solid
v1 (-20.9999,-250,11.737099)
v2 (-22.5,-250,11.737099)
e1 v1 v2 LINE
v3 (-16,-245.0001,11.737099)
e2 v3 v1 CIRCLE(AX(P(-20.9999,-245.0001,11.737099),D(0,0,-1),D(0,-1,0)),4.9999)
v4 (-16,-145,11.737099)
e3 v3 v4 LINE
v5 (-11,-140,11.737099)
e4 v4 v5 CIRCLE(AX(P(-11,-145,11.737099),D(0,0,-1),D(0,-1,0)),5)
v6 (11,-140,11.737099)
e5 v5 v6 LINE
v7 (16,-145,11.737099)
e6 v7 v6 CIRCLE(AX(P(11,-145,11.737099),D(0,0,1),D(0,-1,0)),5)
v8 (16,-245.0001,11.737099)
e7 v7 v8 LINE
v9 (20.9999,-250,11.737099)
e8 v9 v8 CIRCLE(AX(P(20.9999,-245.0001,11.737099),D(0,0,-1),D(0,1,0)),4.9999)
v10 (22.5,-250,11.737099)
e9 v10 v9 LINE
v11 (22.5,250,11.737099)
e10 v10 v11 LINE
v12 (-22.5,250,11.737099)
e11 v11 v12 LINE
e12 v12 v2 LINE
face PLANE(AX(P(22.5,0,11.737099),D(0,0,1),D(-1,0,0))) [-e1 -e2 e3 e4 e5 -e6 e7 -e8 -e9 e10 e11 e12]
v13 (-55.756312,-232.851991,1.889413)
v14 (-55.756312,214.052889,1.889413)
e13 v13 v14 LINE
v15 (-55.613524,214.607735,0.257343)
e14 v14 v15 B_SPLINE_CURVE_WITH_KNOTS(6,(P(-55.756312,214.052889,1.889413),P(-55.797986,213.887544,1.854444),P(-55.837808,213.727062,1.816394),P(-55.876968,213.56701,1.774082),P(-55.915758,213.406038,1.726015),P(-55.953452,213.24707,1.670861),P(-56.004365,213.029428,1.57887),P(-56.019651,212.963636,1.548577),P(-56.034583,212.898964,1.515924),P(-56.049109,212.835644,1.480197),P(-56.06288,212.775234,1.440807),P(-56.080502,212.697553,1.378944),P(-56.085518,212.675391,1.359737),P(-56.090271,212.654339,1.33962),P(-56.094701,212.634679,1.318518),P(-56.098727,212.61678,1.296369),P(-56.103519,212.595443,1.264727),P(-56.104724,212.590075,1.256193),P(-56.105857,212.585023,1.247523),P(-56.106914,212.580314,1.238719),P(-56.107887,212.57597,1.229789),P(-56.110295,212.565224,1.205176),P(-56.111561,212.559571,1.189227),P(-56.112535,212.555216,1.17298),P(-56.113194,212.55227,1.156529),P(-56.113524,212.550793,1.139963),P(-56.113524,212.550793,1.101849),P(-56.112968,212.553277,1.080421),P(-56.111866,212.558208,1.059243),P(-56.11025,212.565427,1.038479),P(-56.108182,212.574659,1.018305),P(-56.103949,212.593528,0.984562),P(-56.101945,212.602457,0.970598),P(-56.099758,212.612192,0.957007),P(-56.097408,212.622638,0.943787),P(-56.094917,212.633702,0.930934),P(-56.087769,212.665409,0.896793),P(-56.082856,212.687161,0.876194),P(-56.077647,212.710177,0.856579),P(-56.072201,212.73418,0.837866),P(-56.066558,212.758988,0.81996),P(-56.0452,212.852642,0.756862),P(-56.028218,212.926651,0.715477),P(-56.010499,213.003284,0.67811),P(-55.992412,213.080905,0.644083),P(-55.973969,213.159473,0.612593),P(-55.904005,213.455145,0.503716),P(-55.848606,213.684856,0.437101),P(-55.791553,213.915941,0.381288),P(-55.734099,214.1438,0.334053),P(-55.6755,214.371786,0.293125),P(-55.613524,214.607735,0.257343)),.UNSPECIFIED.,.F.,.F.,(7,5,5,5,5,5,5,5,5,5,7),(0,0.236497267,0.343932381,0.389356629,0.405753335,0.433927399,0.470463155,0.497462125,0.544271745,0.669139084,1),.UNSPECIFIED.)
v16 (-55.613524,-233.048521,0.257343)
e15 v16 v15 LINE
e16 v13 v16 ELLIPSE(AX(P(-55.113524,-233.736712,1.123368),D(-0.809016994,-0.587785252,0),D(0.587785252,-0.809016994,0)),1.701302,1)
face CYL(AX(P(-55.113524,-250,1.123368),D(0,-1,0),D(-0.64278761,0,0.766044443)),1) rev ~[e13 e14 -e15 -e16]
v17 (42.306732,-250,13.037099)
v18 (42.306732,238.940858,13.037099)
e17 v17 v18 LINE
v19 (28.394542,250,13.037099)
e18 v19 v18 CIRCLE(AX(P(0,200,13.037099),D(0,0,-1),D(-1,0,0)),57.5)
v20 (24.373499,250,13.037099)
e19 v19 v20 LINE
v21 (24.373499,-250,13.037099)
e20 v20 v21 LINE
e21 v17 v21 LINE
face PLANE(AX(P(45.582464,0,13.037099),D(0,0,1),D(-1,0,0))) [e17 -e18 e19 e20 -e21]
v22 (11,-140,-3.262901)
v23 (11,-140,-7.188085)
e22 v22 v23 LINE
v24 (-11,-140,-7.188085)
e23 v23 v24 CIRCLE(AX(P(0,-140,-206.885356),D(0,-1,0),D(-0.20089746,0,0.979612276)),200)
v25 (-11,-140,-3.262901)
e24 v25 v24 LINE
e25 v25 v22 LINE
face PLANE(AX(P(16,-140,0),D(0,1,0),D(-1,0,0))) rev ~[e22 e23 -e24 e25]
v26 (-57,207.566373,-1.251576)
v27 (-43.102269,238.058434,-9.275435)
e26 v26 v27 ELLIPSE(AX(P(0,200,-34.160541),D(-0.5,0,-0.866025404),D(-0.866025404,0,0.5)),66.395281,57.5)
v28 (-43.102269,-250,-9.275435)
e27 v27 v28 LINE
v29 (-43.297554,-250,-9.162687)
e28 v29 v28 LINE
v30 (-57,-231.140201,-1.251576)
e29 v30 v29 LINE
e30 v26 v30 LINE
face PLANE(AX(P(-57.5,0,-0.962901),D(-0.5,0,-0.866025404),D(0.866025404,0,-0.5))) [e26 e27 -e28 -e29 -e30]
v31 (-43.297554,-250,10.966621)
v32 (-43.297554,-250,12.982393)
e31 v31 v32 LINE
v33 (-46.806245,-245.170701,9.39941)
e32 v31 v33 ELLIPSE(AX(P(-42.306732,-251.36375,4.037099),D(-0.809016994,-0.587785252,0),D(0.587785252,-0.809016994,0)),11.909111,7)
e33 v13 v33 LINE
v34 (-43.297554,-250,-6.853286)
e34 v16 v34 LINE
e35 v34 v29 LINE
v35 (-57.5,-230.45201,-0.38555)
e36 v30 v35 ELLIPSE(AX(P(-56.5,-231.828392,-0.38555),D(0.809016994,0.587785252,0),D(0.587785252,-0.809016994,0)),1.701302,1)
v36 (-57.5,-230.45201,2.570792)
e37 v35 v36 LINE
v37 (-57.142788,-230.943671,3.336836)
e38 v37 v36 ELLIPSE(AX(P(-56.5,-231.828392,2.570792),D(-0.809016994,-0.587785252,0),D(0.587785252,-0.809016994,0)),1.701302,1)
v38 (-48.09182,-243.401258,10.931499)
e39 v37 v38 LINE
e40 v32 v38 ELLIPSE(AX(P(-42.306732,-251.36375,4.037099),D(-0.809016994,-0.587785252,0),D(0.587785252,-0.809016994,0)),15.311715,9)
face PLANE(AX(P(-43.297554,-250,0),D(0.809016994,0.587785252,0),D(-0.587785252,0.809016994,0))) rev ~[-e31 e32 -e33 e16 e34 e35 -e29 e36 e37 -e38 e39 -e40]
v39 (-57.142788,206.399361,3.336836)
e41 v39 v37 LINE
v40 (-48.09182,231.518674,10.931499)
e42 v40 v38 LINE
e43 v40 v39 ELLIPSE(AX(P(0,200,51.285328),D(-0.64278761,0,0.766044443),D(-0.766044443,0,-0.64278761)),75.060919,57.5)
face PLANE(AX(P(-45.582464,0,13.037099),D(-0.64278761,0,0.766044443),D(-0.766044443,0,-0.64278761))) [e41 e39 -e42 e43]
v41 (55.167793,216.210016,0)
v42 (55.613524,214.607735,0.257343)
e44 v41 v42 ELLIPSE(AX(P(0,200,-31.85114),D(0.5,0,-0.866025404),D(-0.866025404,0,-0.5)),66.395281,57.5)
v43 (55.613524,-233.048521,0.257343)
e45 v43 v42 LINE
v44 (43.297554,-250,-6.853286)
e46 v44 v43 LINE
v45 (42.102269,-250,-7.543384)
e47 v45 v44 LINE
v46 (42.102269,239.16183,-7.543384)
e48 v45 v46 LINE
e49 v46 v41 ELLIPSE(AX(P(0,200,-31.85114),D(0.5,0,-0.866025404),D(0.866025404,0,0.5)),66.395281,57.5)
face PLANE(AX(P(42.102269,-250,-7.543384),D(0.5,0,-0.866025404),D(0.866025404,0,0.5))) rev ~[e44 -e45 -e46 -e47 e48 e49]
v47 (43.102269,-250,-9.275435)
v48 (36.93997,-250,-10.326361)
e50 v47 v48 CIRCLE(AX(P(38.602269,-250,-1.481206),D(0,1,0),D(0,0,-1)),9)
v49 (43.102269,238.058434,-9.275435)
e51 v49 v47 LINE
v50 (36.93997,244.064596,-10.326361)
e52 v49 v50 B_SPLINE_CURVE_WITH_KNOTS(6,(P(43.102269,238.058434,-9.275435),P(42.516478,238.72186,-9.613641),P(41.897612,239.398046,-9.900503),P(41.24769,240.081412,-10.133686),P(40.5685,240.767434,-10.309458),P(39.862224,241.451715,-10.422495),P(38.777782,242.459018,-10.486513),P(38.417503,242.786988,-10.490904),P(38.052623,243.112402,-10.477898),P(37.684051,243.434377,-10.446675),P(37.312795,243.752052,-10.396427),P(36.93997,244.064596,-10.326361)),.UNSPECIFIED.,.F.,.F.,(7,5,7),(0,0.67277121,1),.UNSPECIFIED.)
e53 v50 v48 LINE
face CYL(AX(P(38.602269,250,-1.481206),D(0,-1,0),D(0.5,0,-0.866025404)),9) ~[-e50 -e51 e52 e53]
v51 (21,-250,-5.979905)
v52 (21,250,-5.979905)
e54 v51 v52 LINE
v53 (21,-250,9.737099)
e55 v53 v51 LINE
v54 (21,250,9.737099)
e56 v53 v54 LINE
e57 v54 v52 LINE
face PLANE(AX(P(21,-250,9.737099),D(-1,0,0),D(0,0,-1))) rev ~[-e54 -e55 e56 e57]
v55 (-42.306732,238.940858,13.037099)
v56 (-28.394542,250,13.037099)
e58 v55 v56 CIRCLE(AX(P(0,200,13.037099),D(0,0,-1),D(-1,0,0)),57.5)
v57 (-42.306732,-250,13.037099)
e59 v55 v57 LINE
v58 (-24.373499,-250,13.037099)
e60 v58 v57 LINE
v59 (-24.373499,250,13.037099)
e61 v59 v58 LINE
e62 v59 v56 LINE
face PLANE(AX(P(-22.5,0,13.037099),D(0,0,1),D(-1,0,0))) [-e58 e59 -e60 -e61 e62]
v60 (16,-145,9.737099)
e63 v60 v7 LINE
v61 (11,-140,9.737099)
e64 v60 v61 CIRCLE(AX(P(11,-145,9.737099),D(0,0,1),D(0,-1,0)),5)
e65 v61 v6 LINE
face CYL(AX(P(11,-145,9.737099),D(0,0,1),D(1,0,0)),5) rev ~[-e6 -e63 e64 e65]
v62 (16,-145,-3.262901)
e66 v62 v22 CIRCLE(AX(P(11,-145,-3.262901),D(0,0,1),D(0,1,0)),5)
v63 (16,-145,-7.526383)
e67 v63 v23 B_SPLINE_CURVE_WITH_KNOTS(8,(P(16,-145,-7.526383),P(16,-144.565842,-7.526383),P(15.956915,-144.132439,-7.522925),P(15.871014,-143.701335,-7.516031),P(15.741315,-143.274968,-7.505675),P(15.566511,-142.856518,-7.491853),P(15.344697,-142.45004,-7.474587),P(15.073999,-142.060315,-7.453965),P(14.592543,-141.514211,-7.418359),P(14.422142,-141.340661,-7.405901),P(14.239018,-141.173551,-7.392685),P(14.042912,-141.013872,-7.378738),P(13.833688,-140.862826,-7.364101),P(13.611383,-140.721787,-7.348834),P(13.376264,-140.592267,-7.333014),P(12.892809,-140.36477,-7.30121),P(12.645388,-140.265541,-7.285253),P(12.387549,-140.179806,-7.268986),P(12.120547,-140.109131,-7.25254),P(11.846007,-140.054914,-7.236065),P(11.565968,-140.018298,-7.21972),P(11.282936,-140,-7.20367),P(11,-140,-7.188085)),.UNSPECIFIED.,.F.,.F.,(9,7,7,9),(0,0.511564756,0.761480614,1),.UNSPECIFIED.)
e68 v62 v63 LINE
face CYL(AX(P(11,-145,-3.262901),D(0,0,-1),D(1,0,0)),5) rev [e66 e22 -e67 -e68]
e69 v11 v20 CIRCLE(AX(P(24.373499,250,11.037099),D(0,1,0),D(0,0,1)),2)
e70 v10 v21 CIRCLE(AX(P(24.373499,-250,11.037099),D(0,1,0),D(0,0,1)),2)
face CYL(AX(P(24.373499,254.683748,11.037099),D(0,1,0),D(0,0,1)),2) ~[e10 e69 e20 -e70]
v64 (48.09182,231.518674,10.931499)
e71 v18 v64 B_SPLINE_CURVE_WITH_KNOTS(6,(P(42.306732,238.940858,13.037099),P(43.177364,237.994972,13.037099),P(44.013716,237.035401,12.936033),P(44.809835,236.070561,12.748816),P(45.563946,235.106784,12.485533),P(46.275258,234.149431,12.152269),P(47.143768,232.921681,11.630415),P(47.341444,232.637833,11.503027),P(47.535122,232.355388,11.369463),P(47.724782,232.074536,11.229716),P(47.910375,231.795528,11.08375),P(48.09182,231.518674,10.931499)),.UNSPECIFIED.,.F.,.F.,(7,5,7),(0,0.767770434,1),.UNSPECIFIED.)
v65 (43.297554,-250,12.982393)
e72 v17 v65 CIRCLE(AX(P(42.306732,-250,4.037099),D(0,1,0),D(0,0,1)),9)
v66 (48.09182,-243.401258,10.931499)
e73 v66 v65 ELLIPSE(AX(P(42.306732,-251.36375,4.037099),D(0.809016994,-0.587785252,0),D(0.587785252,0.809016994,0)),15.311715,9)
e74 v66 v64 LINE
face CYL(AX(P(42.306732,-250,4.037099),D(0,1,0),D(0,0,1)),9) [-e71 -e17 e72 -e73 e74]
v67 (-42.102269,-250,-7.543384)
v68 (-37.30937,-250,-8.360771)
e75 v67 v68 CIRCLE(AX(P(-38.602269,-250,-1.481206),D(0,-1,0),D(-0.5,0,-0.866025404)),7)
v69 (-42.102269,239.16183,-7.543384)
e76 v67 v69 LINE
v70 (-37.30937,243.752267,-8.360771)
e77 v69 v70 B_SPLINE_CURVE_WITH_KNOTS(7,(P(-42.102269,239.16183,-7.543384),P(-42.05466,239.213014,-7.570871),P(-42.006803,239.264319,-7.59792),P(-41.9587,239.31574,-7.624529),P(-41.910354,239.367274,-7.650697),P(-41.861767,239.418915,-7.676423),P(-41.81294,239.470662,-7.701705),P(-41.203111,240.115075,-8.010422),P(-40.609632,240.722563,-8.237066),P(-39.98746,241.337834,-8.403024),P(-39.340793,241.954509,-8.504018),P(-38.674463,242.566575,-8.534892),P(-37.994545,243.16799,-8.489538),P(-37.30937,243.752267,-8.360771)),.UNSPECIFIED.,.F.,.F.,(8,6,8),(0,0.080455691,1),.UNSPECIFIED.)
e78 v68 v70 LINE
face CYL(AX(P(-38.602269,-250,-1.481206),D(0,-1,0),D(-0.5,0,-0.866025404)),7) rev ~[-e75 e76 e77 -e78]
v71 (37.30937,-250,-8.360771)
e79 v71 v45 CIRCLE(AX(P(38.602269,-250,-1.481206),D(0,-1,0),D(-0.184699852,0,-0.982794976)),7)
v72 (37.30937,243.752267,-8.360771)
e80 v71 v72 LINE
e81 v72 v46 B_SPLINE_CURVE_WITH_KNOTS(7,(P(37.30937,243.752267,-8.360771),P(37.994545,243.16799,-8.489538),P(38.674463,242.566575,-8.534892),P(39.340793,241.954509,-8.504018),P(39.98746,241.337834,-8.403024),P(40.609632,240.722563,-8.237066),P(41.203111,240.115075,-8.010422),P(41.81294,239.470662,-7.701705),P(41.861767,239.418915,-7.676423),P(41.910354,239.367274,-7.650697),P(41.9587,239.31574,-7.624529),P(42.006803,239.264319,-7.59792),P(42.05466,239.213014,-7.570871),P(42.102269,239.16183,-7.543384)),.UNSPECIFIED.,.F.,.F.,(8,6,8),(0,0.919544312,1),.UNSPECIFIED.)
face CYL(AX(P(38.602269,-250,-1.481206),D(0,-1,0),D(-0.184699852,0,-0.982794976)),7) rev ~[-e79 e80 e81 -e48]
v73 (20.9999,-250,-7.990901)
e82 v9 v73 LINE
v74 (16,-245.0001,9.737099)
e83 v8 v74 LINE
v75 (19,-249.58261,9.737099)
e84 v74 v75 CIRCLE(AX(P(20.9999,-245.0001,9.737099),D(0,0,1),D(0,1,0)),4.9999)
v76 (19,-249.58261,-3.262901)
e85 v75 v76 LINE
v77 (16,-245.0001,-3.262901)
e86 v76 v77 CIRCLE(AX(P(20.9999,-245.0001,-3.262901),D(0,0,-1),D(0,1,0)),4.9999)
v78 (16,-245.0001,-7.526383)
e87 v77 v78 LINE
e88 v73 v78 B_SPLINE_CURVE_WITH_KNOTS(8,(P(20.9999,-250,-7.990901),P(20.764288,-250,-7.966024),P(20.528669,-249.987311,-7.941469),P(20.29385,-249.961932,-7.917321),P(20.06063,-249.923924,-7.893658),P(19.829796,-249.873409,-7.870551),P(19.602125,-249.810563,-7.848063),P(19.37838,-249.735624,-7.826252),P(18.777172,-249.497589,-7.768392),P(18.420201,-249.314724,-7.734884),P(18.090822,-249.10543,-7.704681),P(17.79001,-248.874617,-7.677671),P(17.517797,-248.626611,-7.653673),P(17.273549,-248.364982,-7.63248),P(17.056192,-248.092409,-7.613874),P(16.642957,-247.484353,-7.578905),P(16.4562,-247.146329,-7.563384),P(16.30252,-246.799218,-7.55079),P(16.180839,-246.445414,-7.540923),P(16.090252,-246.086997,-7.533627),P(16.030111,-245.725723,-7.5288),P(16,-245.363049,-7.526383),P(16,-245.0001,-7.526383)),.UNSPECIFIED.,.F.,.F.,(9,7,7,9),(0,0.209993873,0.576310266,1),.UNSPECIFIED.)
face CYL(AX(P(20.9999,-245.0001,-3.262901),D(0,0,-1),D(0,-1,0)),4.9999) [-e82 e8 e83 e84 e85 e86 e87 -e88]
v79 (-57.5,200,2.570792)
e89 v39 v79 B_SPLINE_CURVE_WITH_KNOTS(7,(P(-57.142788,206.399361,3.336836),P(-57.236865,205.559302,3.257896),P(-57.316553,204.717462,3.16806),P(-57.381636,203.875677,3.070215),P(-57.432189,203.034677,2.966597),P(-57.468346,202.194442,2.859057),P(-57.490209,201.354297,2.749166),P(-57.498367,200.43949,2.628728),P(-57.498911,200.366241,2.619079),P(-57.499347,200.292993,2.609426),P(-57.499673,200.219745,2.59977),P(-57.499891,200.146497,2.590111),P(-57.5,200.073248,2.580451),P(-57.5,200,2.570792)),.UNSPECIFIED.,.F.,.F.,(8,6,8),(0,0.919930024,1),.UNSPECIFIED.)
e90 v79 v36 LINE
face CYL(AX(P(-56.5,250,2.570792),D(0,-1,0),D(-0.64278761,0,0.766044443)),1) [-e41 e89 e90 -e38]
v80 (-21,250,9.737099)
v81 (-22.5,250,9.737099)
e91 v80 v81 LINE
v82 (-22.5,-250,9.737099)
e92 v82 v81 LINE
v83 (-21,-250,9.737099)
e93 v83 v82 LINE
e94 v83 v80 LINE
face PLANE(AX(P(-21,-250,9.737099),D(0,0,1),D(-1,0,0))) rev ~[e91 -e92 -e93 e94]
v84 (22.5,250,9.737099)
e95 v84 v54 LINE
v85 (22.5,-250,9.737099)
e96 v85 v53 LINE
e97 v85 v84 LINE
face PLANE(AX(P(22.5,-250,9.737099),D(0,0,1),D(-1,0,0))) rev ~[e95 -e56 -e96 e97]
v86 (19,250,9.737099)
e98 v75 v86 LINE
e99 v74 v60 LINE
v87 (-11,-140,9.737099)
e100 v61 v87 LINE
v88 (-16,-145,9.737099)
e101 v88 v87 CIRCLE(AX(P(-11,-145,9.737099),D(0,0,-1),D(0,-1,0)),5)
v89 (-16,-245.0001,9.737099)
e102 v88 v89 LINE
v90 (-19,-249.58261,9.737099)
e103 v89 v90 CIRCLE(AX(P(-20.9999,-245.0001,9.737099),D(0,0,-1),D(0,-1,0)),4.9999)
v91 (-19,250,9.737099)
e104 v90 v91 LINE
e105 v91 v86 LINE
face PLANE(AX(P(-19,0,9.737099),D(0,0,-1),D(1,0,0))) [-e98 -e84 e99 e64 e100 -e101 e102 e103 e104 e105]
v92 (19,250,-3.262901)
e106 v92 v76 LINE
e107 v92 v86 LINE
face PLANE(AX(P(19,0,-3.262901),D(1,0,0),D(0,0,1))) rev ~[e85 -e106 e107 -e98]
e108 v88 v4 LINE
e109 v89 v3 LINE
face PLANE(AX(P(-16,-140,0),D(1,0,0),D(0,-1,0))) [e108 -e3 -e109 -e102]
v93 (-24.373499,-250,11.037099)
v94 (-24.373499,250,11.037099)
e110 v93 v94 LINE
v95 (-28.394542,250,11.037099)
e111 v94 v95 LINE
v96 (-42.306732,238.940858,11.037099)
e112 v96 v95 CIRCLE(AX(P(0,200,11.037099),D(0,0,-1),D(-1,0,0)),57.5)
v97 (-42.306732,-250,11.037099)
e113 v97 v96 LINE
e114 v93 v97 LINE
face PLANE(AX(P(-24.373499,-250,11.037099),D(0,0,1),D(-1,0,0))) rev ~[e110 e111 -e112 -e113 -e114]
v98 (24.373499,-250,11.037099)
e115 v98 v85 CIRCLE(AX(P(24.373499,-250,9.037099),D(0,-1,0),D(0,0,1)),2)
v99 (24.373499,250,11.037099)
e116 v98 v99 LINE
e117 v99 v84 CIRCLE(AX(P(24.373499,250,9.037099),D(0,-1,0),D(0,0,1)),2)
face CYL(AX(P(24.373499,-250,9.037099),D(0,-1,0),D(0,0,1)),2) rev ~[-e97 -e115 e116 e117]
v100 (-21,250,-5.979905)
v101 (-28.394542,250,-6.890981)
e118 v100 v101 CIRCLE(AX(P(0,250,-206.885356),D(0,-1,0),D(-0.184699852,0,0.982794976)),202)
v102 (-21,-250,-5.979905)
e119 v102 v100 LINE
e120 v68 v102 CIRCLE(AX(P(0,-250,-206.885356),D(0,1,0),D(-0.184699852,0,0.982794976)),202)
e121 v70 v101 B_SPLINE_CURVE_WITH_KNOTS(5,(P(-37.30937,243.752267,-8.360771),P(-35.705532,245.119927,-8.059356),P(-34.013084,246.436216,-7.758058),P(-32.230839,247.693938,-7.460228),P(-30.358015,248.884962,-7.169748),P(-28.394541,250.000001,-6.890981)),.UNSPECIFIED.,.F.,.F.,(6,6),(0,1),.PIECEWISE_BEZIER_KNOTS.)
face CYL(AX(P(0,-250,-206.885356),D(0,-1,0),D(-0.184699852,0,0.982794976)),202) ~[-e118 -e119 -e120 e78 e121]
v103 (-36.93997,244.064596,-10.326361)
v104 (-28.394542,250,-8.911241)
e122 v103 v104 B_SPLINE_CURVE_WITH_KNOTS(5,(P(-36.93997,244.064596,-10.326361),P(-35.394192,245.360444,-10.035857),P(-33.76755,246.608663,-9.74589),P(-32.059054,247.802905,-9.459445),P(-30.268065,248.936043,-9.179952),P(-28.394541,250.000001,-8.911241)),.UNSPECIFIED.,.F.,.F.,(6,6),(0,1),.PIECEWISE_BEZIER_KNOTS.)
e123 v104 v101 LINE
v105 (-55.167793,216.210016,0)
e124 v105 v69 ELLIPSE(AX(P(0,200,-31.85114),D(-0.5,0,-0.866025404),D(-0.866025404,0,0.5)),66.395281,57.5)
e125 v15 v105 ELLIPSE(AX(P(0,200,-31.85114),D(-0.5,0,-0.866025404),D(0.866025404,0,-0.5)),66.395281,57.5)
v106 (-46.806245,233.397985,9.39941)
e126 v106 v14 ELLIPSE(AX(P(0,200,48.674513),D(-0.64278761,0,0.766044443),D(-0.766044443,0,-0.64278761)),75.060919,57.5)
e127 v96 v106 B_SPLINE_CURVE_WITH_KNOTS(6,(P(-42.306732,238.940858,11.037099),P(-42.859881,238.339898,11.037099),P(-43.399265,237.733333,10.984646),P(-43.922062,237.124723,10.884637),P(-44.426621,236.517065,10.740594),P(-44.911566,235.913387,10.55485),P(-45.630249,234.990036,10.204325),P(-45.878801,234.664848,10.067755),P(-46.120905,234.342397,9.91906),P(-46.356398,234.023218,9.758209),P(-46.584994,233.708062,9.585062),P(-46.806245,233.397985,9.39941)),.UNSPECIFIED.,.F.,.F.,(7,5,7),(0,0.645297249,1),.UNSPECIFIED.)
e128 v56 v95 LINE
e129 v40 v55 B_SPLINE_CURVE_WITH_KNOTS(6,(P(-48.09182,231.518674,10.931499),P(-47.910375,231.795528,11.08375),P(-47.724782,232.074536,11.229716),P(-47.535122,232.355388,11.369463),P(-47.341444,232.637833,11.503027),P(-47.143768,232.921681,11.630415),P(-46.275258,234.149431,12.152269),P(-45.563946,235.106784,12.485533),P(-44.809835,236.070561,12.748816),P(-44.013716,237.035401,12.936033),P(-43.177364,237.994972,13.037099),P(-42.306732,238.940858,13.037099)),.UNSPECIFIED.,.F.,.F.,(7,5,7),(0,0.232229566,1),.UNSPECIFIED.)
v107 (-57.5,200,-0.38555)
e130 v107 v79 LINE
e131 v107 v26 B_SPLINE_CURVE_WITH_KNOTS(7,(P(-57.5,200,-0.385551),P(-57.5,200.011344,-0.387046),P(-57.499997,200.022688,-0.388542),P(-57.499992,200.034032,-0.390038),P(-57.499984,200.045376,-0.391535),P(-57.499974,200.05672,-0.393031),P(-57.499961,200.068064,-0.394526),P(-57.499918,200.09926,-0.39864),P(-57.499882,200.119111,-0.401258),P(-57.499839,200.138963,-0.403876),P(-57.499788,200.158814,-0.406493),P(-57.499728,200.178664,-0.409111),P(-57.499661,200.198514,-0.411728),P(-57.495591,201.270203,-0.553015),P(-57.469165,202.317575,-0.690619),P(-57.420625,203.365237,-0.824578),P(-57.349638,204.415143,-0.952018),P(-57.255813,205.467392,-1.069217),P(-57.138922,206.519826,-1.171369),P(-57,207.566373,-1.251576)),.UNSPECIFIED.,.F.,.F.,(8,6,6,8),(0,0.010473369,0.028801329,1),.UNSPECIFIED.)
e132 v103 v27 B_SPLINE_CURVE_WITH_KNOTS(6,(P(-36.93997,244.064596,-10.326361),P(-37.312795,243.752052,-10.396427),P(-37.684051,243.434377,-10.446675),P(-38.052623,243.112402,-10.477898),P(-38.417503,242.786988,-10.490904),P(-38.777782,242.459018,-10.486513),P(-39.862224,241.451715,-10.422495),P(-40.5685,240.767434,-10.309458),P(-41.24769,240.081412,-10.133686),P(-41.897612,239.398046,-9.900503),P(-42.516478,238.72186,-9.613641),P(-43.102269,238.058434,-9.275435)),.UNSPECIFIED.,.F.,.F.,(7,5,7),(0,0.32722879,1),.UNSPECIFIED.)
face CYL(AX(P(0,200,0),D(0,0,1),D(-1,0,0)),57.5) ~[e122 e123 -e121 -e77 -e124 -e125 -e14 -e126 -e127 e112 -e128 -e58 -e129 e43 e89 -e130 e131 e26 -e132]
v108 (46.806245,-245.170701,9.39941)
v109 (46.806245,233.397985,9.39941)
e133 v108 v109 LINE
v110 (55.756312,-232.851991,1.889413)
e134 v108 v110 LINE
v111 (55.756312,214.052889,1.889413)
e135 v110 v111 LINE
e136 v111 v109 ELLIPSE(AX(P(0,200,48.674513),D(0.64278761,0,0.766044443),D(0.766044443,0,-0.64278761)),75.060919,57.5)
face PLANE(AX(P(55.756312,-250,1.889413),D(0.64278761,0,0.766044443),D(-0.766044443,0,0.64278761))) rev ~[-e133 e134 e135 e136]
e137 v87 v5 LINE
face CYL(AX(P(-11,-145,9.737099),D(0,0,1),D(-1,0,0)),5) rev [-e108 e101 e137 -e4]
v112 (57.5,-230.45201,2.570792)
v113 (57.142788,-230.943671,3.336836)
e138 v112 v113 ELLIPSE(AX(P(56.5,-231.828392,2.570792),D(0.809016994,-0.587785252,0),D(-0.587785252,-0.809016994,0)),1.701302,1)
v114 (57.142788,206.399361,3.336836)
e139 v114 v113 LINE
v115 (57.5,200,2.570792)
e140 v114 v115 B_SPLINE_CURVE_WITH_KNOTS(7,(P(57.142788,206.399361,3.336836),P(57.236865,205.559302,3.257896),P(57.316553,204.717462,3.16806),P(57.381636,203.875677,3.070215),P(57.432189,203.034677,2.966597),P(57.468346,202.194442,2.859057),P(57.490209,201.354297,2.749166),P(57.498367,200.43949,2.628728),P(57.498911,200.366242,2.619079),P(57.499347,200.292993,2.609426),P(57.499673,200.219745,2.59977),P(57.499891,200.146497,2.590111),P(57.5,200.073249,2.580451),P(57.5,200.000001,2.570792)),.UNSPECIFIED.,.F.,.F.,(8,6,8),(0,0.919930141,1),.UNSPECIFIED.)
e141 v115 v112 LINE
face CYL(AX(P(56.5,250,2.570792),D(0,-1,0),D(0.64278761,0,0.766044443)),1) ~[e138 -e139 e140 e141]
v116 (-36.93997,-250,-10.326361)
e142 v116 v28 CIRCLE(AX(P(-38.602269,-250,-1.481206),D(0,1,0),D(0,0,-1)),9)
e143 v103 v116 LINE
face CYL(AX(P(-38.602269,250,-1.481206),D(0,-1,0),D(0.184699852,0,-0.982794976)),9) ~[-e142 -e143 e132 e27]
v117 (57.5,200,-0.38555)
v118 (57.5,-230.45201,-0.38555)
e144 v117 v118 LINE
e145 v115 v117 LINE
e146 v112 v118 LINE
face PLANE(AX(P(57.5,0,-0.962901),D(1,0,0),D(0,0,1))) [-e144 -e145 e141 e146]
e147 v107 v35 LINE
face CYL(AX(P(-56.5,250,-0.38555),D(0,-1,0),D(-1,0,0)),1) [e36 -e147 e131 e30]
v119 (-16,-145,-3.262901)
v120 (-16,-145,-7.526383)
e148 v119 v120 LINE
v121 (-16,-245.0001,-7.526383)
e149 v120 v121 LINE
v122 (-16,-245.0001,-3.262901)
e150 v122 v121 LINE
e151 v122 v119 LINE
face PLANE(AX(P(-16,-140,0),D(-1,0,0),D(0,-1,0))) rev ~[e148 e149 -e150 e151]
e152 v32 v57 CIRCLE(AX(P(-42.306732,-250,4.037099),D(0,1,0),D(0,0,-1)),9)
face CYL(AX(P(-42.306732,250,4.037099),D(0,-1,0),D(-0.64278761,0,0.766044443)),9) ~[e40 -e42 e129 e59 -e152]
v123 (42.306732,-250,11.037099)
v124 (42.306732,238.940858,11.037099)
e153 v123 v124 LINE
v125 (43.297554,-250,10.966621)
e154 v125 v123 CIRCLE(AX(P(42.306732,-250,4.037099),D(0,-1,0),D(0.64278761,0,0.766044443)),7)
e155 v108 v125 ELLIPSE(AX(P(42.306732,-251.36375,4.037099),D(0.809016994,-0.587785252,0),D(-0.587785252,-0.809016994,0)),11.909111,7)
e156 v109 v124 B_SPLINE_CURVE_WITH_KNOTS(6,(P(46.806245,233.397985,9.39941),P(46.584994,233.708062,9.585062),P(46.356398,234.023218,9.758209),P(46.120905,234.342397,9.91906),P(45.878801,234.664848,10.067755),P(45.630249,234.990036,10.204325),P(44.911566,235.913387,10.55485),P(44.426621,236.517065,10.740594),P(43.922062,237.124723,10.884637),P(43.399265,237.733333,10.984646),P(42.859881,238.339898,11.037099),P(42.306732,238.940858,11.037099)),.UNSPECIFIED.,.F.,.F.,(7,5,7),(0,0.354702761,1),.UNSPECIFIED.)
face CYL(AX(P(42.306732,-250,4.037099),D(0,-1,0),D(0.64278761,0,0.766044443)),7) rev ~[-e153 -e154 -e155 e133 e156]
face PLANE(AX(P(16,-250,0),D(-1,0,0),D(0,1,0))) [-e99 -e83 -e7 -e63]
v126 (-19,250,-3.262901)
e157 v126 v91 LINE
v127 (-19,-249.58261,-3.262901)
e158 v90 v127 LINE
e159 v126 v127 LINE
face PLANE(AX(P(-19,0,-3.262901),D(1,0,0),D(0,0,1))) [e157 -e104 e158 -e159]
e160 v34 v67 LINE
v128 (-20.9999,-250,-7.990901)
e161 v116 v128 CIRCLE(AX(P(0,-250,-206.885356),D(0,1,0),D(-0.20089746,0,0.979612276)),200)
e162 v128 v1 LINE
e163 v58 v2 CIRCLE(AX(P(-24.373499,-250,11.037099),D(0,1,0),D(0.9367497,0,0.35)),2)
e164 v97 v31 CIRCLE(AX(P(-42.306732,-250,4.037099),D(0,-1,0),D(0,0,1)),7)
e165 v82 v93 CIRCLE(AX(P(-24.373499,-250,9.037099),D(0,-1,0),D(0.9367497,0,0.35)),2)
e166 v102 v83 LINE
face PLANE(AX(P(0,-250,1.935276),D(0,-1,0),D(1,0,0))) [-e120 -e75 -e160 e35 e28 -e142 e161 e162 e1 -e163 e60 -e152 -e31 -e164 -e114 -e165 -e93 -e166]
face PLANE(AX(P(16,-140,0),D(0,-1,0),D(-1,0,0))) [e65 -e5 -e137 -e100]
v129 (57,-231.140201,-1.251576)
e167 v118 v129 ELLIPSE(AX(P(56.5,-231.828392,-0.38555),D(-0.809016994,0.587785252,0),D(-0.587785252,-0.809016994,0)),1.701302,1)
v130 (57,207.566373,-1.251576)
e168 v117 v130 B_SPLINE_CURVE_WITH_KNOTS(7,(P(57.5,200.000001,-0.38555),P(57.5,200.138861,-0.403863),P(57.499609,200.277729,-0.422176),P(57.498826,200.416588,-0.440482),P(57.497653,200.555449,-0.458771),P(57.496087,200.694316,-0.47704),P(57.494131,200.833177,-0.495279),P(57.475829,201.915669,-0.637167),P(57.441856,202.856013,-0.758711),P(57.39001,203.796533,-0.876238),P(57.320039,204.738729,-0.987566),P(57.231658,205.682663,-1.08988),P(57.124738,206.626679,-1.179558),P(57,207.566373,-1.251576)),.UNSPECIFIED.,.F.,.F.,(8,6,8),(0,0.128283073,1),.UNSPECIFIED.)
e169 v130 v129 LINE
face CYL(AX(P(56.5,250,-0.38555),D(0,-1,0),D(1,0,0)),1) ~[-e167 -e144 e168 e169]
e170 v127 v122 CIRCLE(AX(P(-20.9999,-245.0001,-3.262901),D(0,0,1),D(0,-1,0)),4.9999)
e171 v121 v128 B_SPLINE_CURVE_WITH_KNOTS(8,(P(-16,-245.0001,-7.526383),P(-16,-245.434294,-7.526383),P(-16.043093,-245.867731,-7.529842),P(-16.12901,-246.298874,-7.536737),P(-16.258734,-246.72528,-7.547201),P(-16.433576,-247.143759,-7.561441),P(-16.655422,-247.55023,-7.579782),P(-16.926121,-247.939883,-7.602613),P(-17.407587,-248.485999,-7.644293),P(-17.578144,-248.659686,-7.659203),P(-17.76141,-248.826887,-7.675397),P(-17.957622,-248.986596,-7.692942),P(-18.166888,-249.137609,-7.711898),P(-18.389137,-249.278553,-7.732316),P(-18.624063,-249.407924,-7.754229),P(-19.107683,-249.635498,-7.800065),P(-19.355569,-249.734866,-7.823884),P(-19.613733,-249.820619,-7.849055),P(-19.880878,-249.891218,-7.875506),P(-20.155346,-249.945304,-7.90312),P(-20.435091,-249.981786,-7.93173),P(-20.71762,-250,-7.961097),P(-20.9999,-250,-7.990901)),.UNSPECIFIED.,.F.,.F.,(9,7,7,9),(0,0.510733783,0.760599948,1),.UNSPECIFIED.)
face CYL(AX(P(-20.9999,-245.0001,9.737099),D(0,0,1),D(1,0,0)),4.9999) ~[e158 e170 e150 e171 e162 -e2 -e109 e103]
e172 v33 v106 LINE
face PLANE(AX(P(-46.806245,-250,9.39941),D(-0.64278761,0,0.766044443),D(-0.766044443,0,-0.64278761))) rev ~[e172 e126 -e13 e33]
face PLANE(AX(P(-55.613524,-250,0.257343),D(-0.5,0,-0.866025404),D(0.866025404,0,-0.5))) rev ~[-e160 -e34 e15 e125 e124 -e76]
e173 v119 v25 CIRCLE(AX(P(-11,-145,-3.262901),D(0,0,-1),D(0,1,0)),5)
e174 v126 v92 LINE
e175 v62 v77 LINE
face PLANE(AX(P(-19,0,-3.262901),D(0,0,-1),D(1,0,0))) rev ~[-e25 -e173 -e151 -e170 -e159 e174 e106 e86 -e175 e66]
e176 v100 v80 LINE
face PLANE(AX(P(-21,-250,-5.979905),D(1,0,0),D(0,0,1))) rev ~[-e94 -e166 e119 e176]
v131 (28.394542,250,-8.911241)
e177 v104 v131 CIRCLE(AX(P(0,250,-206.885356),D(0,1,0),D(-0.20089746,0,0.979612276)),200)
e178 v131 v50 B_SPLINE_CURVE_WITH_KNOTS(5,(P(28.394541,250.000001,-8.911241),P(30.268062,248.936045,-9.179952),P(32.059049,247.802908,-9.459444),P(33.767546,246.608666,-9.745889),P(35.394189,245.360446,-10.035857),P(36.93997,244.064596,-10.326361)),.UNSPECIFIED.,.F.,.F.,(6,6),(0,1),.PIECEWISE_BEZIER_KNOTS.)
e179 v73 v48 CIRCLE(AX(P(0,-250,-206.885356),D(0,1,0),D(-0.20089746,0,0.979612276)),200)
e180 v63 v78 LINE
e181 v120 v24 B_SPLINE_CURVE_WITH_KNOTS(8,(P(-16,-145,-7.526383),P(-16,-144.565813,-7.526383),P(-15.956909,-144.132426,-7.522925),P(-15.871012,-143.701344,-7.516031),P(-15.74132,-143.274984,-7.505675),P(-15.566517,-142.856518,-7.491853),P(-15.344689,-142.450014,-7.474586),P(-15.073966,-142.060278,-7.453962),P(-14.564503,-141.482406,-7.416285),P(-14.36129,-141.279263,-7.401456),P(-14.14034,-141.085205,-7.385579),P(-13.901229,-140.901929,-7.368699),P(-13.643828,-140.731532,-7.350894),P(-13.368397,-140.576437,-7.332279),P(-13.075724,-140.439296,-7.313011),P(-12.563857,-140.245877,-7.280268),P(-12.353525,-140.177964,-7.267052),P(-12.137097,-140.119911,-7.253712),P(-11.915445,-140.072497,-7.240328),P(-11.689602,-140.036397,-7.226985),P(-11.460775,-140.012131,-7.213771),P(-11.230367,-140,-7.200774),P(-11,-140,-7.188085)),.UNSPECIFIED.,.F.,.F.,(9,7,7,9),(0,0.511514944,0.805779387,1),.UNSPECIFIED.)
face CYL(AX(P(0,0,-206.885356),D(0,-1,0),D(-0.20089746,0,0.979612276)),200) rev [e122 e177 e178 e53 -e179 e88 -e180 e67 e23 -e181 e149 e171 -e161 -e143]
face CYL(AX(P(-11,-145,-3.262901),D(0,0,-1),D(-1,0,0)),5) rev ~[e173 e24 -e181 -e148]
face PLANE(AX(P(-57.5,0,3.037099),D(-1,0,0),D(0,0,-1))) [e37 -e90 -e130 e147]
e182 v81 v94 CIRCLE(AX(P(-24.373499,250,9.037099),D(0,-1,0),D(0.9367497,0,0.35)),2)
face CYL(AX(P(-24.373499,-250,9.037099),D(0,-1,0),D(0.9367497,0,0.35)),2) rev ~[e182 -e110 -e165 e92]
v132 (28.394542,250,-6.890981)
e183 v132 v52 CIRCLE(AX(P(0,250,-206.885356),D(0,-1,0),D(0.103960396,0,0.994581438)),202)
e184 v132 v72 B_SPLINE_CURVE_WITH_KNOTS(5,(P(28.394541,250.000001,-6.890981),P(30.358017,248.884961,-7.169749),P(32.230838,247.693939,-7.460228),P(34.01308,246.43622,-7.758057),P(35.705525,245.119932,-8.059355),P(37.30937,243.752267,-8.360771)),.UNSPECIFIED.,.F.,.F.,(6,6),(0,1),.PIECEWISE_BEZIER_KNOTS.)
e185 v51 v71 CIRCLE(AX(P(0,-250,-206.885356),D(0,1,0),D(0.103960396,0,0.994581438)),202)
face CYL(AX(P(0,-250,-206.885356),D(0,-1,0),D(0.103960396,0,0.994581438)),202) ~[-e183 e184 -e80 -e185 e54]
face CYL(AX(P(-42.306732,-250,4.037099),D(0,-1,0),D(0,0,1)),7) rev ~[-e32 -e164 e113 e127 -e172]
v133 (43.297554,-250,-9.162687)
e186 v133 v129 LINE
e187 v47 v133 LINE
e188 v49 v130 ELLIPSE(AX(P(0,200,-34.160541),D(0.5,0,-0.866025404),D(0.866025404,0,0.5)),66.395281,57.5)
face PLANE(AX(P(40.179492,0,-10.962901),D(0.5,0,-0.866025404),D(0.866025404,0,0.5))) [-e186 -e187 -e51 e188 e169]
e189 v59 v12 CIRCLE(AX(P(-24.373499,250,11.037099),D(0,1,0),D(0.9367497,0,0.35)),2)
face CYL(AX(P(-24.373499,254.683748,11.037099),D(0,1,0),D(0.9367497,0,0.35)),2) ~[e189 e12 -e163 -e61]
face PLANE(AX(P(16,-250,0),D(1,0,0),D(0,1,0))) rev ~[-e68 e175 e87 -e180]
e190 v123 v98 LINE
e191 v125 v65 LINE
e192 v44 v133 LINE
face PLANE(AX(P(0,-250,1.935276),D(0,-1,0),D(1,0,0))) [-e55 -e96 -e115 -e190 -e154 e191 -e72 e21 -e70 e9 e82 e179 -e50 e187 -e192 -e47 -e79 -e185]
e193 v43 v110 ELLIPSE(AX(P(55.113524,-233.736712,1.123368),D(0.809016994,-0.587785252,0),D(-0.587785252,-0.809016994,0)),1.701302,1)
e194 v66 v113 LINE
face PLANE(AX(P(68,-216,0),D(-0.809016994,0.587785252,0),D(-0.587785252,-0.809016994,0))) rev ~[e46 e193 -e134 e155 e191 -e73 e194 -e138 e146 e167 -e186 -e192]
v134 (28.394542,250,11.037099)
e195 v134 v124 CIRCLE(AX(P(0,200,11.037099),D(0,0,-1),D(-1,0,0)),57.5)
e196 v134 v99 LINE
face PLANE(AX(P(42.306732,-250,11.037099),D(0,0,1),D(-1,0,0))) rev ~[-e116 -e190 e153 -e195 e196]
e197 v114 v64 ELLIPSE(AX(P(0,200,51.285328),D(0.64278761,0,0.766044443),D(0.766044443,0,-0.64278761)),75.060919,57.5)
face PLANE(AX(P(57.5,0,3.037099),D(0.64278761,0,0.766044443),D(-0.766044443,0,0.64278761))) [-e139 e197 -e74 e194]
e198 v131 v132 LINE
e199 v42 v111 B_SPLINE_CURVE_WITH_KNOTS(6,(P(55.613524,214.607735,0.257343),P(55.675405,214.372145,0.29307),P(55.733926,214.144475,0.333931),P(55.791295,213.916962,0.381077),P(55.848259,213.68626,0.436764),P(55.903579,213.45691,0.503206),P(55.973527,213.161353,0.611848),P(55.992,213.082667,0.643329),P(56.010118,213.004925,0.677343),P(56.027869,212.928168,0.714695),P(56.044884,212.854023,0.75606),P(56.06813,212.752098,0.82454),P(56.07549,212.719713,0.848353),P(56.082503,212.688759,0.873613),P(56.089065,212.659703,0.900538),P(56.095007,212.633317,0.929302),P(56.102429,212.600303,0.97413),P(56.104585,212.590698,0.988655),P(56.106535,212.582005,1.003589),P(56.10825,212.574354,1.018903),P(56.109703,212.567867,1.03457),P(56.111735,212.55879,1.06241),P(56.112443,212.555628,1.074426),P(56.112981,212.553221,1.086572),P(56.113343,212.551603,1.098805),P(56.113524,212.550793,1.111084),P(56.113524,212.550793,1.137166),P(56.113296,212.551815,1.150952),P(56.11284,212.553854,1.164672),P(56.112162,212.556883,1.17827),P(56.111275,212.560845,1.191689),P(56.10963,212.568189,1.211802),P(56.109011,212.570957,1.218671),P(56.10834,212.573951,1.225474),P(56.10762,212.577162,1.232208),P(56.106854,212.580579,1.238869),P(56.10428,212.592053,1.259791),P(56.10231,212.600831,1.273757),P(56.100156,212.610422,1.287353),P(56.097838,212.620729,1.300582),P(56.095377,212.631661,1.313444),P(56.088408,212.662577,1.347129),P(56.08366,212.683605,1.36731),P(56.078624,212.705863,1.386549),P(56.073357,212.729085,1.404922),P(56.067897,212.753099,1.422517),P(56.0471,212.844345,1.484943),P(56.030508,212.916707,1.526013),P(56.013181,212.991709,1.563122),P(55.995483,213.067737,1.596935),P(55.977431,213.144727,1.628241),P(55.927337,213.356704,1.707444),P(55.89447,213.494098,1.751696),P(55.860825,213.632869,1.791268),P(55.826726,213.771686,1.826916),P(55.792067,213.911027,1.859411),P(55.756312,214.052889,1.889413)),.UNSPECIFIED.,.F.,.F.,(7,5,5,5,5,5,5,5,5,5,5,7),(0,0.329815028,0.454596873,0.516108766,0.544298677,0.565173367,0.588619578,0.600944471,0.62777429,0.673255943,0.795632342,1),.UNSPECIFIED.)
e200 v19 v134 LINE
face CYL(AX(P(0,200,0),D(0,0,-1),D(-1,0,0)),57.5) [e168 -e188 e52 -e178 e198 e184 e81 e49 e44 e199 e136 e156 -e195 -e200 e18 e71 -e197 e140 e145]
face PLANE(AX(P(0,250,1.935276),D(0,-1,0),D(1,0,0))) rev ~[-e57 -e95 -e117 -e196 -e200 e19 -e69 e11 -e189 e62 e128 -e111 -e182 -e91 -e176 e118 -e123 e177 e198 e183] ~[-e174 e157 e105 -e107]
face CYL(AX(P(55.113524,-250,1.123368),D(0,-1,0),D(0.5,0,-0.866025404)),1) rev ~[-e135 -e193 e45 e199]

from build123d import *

# Parameters (mm, degrees)
F1_DEPTH       = 250
F2_W           = 38
F2_H           = 13
F3_DEPTH       = 250
F4_T1_DEPTH    = 509.3674969976
F5_R           = 9
F6_R           = 1
F8_DEPTH       = 500.001
F10_DEPTH      = 10.482205926
F10_DEPTH_BACK = 13.0380992553
F12_DEPTH      = 13.0380993553
F12_DEPTH_BACK = 10.4822060387
F13_F1_R       = 4.9999
F13_F2_R       = 5
F13_F3_R       = 5
F13_F4_R       = 4.9999
F13_F5_R       = 5
F13_F6_R       = 5


# Not quite as in the source:
# - a fillet or chamfer that OpenCascade refuses, or shapes differently, is made with other operations: its cross-section is extruded or revolved along the edge and cut away or added
# - a fillet or chamfer is up to 0.001 mm smaller than in the source, because OpenCascade refuses the exact size


with BuildPart() as f1:
    # F0 (on Front) → F1 (new body, symmetric)
    with BuildSketch(Plane.XZ):
        with BuildLine():
            Line((22.5, 11.7370992553), (0, 11.7370992553))
            Line((0, 11.7370992553), (-22.5, 11.7370992553))
            Line((-22.5, 11.7370992553), (-22.5, 13.0370992553))
            Line((-22.5, 13.0370992553), (-45.5824640741, 13.0370992553))
            Line((-45.5824640741, 13.0370992553), (-57.5, 3.0370992553))
            Line((-57.5, 3.0370992553), (-57.5, -0.9629007447))
            Line((-57.5, -0.9629007447), (-40.1794919243, -10.9629007447))
            ThreePointArc((-40.1794919243, -10.9629007447), (0, -6.8853558863), (40.1794919243, -10.9629007447))
            Line((40.1794919243, -10.9629007447), (57.5, -0.9629007447))
            Line((57.5, -0.9629007447), (57.5, 3.0370992553))
            Line((57.5, 3.0370992553), (45.5824640741, 13.0370992553))
            Line((45.5824640741, 13.0370992553), (22.5, 13.0370992553))
            Line((22.5, 13.0370992553), (22.5, 11.7370992553))
        make_face()
    extrude(amount=F1_DEPTH, both=True)

    # F2 (on Front) → F3 (cut, symmetric)
    with BuildSketch(Plane.XZ):
        with Locations((0, 3.2370992553)):
            Rectangle(F2_W, F2_H)
    extrude(amount=F3_DEPTH, both=True, mode=Mode.SUBTRACT)

    # F4: fillet of radius 2 on 2 edges, made by hand

    # F4_s2 → F4_t1 (cut)
    with BuildSketch(Plane.XZ.offset(-254.6837484988)):
        with BuildLine():
            ThreePointArc((-22.5, 11.7370992553), (-23.2333239744, 12.6802669278), (-24.3734993995, 13.0370992553))
            Line((-24.3734993995, 13.0370992553), (-22.5, 13.0370992553))
            Line((-22.5, 13.0370992553), (-22.5, 11.7370992553))
        make_face()
        with BuildLine():
            ThreePointArc((24.3734993995, 13.0370992553), (23.2333239744, 12.6802669278), (22.5, 11.7370992553))
            Line((22.5, 11.7370992553), (22.5, 13.0370992553))
            Line((22.5, 13.0370992553), (24.3734993995, 13.0370992553))
        make_face()
    extrude(amount=F4_T1_DEPTH, mode=Mode.SUBTRACT)

    # F5
    f5_edges = [f1.edges().sort_by_distance(p)[0] for p in [
        (-45.582464, 0, 13.037099),
        (45.582464, 0, 13.037099),
        (-40.179492, 0, -10.962901),
        (40.179492, 0, -10.962901),
    ]]
    fillet(f5_edges, radius=F5_R)

    # F6
    f6_edges = [f1.edges().sort_by_distance(p)[0] for p in [
        (57.5, 0, 3.037099),
        (57.5, 0, -0.962901),
        (-57.5, 0, 3.037099),
        (-57.5, 0, -0.962901),
    ]]
    fillet(f6_edges, radius=F6_R)

    # F7 (on face) → F8 (cut, through all)
    with BuildSketch(Plane.XZ.offset(250)):
        with BuildLine():
            ThreePointArc((-42.1022690923, -7.5433837525), (-39.7790673433, -8.3815788055), (-37.3093701274, -8.3607707572))
            ThreePointArc((-37.3093701274, -8.3607707572), (-29.1789785809, -7.0039230093), (-21, -5.9799054874))
            Line((-21, -5.9799054874), (-21, 9.7370992553))
            Line((-21, 9.7370992553), (-22.5, 9.7370992553))
            ThreePointArc((-22.5, 9.7370992553), (-23.2333239744, 10.6802669278), (-24.3734993995, 11.0370992553))
            Line((-24.3734993995, 11.0370992553), (-42.3067319657, 11.0370992553))
            ThreePointArc((-42.3067319657, 11.0370992553), (-44.7008729689, 10.6149476008), (-46.8062452335, 9.3994103571))
            Line((-46.8062452335, 9.3994103571), (-55.7563117574, 1.8894128378))
            ThreePointArc((-55.7563117574, 1.8894128378), (-56.1097188459, 1.036212652), (-55.6135241478, 0.2573429909))
            Line((-55.6135241478, 0.2573429909), (-42.1022690923, -7.5433837525))
        make_face()
        with BuildLine():
            Line((55.7563117574, 1.8894128378), (46.8062452335, 9.3994103571))
            ThreePointArc((46.8062452335, 9.3994103571), (44.7008729689, 10.6149476008), (42.3067319657, 11.0370992553))
            Line((42.3067319657, 11.0370992553), (24.3734993995, 11.0370992553))
            ThreePointArc((24.3734993995, 11.0370992553), (23.2333239744, 10.6802669278), (22.5, 9.7370992553))
            Line((22.5, 9.7370992553), (21, 9.7370992553))
            Line((21, 9.7370992553), (21, -5.9799054874))
            ThreePointArc((21, -5.9799054874), (29.1789785809, -7.0039230093), (37.3093701274, -8.3607707572))
            ThreePointArc((37.3093701274, -8.3607707572), (39.7790673433, -8.3815788055), (42.1022690923, -7.5433837525))
            Line((42.1022690923, -7.5433837525), (55.6135241478, 0.2573429909))
            ThreePointArc((55.6135241478, 0.2573429909), (56.1097188459, 1.036212652), (55.7563117574, 1.8894128378))
        make_face()
    extrude(amount=-F8_DEPTH, mode=Mode.SUBTRACT)

    # F9 (on Top) → F10 (cut, two sides)
    with BuildSketch(Plane.XY) as f10_sk:
        with BuildLine():
            ThreePointArc((-57.5, 200), (0, 257.5), (57.5, 200))
            Line((57.5, 200), (57.5, 280))
            Line((57.5, 280), (-57.5, 280))
            Line((-57.5, 280), (-57.5, 200))
        make_face()
    extrude(amount=-F10_DEPTH, mode=Mode.SUBTRACT)
    extrude(f10_sk.sketch, amount=F10_DEPTH_BACK, mode=Mode.SUBTRACT)

    # F11 (on Top) → F12 (cut, two sides)
    with BuildSketch(Plane.XY) as f12_sk:
        Polygon((16, -140), (-16, -140), (-16, -250), (-43.2975540478, -250), (-68, -216), (-68, -346), (68, -346), (68, -216), (43.2975540478, -250), (16, -250), align=None)
    extrude(amount=F12_DEPTH, mode=Mode.SUBTRACT)
    extrude(f12_sk.sketch, amount=-F12_DEPTH_BACK, mode=Mode.SUBTRACT)

    # F13: fillet of radius 5 on 8 edges, made by hand

    # F13_f1 (radius 5 in the source; OpenCascade refuses exactly that, so slightly less here)
    f13_f1_edges = [f1.edges().sort_by_distance(p)[0] for p in [
        (16, -250, -5.3946419605),
    ]]
    fillet(f13_f1_edges, radius=F13_F1_R)

    # F13_f2
    f13_f2_edges = [f1.edges().sort_by_distance(p)[0] for p in [
        (16, -140, -5.3946419605),
    ]]
    fillet(f13_f2_edges, radius=F13_F2_R)

    # F13_f3
    f13_f3_edges = [f1.edges().sort_by_distance(p)[0] for p in [
        (16, -140, 10.7370992553),
    ]]
    fillet(f13_f3_edges, radius=F13_F3_R)

    # F13_f4 (radius 5 in the source; OpenCascade refuses exactly that, so slightly less here)
    f13_f4_edges = [f1.edges().sort_by_distance(p)[0] for p in [
        (-16, -250, 10.7370992553),
    ]]
    fillet(f13_f4_edges, radius=F13_F4_R)

    # F13_f5
    f13_f5_edges = [f1.edges().sort_by_distance(p)[0] for p in [
        (-16, -140, -5.3946419605),
    ]]
    fillet(f13_f5_edges, radius=F13_F5_R)

    # F13_f6
    f13_f6_edges = [f1.edges().sort_by_distance(p)[0] for p in [
        (-16, -140, 10.7370992553),
    ]]
    fillet(f13_f6_edges, radius=F13_F6_R)


solid = f1.part
